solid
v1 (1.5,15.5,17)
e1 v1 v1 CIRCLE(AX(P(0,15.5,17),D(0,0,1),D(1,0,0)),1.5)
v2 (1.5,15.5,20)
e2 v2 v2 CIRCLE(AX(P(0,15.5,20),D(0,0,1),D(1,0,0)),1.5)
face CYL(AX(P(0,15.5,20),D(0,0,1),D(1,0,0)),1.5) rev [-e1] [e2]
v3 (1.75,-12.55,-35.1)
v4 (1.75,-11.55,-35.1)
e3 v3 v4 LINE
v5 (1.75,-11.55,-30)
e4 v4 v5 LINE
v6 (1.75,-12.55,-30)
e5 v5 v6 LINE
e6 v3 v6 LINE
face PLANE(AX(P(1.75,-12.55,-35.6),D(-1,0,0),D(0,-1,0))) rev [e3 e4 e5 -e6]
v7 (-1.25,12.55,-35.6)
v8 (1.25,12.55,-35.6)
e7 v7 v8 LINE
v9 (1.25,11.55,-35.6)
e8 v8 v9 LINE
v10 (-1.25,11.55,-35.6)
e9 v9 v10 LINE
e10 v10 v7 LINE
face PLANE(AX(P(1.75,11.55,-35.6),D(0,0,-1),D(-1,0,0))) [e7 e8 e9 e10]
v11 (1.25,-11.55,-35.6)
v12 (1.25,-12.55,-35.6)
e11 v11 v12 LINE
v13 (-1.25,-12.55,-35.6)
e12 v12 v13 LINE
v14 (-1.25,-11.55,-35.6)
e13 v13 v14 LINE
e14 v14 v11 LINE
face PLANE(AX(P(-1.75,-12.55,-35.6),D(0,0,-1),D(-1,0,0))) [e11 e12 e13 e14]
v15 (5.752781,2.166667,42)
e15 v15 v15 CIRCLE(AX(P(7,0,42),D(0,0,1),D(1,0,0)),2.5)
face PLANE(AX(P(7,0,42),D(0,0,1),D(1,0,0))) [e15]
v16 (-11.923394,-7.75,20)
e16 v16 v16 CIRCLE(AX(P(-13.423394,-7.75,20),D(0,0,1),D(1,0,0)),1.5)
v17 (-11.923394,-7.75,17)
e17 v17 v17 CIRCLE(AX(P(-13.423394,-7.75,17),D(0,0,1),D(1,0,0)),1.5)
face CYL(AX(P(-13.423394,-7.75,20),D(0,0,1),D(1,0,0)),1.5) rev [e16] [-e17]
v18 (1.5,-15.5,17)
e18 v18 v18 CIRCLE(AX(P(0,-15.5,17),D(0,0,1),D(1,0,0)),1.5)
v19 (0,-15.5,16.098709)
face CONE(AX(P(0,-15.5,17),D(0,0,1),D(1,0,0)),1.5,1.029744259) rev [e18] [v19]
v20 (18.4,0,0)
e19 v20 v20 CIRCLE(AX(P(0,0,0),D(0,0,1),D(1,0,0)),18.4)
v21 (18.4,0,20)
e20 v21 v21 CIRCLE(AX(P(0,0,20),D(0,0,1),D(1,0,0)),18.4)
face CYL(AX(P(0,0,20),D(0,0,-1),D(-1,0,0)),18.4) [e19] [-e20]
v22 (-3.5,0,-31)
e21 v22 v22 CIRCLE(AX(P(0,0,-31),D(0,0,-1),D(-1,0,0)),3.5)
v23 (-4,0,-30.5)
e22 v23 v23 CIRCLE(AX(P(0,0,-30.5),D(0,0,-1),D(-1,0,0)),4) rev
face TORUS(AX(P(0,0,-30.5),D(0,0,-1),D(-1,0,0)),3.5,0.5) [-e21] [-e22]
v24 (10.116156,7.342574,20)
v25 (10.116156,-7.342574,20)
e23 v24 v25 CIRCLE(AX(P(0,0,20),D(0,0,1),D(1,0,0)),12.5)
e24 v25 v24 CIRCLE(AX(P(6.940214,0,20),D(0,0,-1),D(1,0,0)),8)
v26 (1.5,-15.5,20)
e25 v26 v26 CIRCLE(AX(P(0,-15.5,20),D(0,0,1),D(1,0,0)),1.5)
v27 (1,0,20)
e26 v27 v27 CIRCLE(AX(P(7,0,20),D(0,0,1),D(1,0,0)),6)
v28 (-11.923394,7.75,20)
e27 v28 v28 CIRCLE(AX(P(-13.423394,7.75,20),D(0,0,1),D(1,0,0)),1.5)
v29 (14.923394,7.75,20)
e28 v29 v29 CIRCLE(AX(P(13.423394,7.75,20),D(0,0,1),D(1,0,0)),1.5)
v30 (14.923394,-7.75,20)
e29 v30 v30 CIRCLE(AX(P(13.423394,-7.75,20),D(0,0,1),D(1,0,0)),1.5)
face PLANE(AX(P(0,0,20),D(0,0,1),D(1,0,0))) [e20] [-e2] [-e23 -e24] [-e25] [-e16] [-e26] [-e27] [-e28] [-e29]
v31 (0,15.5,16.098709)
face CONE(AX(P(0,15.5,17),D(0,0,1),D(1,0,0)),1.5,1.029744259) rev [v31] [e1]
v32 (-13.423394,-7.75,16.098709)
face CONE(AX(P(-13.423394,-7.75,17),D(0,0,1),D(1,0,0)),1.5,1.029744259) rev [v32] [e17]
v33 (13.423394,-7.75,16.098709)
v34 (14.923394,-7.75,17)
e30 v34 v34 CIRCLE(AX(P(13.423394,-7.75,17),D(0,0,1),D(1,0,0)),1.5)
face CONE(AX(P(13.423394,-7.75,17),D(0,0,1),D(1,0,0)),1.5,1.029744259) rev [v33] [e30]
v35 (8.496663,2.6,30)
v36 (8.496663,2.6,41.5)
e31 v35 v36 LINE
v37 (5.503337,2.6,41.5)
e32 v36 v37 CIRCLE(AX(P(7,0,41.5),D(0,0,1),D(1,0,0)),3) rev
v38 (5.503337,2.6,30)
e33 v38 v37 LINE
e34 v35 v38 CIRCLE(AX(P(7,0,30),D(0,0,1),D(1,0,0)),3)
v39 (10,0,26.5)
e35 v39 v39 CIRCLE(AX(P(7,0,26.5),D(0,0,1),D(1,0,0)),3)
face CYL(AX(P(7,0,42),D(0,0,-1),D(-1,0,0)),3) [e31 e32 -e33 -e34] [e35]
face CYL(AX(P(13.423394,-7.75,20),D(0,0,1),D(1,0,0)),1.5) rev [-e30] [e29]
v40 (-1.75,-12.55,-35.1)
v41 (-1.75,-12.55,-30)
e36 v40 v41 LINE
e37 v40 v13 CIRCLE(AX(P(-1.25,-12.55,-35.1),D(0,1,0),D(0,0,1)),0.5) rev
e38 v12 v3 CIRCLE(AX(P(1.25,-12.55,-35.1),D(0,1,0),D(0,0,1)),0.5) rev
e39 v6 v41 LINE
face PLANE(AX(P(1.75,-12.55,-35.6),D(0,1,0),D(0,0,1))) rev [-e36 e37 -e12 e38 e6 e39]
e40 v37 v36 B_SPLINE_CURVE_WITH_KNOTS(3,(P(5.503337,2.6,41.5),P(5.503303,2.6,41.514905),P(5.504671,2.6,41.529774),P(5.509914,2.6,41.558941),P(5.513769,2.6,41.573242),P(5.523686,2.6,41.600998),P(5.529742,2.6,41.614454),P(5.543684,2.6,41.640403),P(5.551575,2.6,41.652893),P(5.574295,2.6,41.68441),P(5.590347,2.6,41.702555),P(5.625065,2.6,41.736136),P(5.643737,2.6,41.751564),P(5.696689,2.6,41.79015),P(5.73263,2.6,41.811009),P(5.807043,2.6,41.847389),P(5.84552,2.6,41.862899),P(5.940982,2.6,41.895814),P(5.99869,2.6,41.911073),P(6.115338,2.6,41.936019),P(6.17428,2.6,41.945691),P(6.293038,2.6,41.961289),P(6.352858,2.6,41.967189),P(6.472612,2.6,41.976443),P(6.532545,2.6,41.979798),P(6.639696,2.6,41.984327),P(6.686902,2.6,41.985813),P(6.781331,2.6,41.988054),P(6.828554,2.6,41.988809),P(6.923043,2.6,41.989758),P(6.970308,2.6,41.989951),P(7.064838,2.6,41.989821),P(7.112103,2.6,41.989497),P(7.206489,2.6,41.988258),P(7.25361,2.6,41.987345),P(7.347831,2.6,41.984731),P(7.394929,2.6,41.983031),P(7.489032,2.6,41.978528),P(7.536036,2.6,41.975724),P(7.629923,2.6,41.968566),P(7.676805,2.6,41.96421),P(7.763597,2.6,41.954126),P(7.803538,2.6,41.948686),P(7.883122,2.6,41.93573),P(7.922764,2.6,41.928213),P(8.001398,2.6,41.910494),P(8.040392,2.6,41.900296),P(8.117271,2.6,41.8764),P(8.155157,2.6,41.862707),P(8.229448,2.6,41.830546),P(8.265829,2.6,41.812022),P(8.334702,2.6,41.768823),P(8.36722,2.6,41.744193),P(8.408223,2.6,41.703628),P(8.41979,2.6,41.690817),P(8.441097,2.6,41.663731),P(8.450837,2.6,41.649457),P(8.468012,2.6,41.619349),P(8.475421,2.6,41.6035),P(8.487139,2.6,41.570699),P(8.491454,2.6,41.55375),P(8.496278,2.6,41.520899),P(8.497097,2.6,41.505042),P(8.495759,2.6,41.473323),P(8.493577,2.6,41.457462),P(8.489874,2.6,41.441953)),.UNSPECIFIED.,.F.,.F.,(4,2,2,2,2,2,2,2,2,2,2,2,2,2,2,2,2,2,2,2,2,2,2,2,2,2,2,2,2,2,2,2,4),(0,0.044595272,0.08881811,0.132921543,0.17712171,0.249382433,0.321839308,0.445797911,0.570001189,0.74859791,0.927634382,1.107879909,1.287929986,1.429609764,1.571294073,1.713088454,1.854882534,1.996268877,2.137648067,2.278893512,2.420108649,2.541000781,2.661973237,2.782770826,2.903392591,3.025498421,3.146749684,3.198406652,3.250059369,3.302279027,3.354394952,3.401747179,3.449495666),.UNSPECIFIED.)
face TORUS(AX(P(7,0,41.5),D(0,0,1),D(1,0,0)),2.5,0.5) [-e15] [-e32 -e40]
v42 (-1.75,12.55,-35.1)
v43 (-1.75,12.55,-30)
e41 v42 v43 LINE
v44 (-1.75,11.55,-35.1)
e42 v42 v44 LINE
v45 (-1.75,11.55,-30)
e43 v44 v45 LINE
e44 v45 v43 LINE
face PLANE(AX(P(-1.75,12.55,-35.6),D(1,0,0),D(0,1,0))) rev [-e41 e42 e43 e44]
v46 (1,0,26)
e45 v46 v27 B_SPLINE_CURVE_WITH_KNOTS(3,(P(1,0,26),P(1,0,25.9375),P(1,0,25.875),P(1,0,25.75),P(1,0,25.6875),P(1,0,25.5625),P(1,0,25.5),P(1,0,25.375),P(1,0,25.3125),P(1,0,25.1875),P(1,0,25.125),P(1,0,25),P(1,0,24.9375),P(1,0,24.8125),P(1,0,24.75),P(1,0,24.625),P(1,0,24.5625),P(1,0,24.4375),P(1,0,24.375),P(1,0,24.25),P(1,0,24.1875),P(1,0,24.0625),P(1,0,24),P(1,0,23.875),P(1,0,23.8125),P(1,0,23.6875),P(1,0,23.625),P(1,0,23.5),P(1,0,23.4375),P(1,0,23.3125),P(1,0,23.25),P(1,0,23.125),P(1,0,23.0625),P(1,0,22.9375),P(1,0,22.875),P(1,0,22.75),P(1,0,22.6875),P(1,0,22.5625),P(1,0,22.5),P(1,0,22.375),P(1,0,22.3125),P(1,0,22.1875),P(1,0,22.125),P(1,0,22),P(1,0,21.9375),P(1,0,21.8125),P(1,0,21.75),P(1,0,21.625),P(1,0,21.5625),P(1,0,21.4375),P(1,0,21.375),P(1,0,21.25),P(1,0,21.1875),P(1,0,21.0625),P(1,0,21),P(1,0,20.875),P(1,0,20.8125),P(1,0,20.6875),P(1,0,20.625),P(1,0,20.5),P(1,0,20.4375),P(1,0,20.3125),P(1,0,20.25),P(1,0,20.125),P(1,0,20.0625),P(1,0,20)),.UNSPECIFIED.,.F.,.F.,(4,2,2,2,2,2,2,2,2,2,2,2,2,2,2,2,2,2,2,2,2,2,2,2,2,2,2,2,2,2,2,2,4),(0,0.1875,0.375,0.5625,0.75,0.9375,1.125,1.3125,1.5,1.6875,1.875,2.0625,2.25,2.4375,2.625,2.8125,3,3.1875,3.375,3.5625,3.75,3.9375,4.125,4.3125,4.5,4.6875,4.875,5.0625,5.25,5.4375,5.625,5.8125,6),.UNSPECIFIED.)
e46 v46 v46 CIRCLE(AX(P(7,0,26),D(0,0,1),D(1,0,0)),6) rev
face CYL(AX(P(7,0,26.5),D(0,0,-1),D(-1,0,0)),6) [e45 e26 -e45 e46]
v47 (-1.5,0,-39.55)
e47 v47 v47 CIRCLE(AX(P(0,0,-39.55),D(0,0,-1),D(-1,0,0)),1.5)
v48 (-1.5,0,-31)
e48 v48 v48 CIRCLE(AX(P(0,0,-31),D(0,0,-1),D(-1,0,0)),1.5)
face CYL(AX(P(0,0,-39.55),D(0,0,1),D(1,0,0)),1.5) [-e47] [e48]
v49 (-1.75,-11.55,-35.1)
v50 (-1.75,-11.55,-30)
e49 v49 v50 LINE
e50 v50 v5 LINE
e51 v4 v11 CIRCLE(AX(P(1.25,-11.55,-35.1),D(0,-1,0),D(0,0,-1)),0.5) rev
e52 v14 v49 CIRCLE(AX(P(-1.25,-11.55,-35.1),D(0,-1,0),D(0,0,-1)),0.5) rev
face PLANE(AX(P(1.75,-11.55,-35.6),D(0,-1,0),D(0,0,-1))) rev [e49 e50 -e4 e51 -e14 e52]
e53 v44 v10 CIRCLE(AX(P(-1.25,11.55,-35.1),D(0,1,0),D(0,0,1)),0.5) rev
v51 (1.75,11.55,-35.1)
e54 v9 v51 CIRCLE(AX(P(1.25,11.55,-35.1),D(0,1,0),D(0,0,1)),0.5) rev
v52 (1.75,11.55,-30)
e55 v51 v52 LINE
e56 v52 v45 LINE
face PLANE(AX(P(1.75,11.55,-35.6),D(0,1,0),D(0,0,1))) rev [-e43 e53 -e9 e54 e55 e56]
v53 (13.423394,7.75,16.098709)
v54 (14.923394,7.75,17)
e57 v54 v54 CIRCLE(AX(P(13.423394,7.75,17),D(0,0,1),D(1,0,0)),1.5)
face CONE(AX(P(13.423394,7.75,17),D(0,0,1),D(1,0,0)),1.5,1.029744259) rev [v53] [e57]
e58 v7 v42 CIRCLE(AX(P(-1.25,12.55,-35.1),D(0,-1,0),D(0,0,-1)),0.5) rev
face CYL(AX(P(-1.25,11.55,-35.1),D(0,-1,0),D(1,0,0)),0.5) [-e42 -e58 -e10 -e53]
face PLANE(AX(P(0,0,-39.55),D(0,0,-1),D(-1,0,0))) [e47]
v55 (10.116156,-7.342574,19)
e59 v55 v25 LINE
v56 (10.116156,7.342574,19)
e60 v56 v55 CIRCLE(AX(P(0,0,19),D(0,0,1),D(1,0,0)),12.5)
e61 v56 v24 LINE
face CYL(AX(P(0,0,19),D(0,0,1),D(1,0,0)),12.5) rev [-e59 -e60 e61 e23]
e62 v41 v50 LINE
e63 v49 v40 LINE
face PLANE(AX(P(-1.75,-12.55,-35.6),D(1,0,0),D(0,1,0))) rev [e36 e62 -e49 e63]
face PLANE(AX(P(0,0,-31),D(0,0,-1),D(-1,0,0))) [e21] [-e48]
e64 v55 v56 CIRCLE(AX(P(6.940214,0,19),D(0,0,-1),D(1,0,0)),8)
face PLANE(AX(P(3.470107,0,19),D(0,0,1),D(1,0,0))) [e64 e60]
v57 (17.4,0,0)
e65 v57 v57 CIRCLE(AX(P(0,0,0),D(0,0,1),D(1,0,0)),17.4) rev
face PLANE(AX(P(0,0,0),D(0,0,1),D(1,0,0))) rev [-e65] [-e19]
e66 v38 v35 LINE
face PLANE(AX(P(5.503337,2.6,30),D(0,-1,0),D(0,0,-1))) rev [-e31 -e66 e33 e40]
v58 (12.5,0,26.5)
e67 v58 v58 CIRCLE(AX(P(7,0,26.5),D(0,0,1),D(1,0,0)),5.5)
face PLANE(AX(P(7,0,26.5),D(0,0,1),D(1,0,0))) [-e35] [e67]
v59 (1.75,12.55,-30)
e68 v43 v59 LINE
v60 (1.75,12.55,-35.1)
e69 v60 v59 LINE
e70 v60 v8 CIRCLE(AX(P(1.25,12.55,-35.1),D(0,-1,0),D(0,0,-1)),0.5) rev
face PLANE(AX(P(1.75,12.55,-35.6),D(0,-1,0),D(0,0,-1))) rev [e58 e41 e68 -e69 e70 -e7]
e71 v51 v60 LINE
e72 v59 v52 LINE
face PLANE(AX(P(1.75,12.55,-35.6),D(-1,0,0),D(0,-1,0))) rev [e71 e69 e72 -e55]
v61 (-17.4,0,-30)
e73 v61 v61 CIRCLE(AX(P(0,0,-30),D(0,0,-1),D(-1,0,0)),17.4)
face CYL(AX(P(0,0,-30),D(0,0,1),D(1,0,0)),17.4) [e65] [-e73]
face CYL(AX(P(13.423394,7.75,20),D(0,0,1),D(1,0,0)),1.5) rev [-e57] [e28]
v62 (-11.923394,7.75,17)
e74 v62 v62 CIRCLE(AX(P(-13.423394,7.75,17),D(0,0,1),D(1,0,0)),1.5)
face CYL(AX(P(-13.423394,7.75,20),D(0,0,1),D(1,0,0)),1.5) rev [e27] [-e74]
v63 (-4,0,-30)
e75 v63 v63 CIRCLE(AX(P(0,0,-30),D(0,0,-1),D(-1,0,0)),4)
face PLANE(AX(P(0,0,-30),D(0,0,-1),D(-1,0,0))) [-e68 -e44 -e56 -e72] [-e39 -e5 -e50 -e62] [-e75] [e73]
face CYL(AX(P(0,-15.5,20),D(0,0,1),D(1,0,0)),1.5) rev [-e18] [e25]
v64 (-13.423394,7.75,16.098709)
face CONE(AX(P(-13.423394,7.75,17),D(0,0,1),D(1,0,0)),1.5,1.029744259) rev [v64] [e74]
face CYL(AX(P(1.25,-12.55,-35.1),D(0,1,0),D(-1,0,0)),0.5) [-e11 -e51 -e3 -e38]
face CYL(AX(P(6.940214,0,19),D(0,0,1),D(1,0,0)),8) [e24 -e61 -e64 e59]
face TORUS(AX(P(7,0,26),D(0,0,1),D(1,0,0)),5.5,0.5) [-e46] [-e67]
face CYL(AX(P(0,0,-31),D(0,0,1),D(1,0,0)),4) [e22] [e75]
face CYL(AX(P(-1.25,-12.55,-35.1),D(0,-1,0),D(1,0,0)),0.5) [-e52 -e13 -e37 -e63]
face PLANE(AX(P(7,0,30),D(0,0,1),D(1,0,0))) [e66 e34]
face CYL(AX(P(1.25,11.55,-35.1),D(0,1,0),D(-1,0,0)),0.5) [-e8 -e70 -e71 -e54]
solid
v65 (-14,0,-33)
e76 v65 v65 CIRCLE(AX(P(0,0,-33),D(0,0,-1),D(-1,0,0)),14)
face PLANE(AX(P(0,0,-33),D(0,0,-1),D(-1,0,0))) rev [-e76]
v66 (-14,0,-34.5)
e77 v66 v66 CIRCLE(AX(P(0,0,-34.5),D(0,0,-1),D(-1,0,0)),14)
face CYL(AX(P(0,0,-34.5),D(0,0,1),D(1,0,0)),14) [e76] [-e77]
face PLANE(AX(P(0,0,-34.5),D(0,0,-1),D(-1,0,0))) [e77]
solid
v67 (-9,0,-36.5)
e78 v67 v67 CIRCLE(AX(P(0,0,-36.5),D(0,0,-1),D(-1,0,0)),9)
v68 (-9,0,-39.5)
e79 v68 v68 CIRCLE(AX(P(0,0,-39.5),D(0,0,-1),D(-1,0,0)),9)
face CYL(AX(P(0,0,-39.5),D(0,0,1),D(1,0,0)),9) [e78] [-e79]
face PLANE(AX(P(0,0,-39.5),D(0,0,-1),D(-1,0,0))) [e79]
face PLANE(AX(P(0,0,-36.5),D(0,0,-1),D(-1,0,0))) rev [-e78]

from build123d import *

# Parameters (mm, degrees)
SKETCH1_R                    = 18.4
BOSS_EXTRUDE1_DEPTH          = 20
SKETCH2_R                    = 17.4
BOSS_EXTRUDE2_DEPTH          = 30
SKETCH3_R                    = 6
BOSS_EXTRUDE3_DEPTH          = 6.5
FILLET1_R                    = 0.5
SKETCH4_R                    = 3
BOSS_EXTRUDE4_DEPTH          = 15.5
CUT_EXTRUDE1_START           = -12
CUT_EXTRUDE1_DEPTH           = 12
F_3_0_3_DIAMETER_HOLE1_D     = 3
F_3_0_3_DIAMETER_HOLE1_DEPTH = 3
F_3_0_3_DIAMETER_HOLE1_TIP   = 0.901290929
CUT_EXTRUDE2_DEPTH           = 1
SKETCH9_R                    = 4
BOSS_EXTRUDE5_DEPTH          = 1
FILLET2_R                    = 0.5
SKETCH10_R                   = 14
BOSS_EXTRUDE6_DEPTH          = 1.5
SKETCH11_W                   = 3.5
SKETCH11_H                   = 1
BOSS_EXTRUDE7_DEPTH          = 5.6
FILLET3_R                    = 0.5
SKETCH13_R                   = 9
BOSS_EXTRUDE8_DEPTH          = 3
SKETCH14_R                   = 1.5
BOSS_EXTRUDE9_DEPTH          = 8.55
FILLET4_R                    = 0.5


with BuildPart() as part:
    # Sketch1 → Boss-Extrude1 (new body)
    with BuildSketch(Plane.XY):
        Circle(SKETCH1_R)
    extrude(amount=BOSS_EXTRUDE1_DEPTH)

    # Sketch2 → Boss-Extrude2 (add)
    with BuildSketch(Plane(origin=(0, 0, 0), x_dir=(-1, 0, 0), z_dir=(0, 0, -1))):
        with Locations(Location((0, 0, 0), (0, 0, 180))):
            Circle(SKETCH2_R)
    extrude(amount=BOSS_EXTRUDE2_DEPTH)

    # Sketch3 → Boss-Extrude3 (add)
    with BuildSketch(Plane.XY.offset(20)):
        with Locations(Location((7, 0, 0), (0, 0, 180))):
            Circle(SKETCH3_R)
    extrude(amount=BOSS_EXTRUDE3_DEPTH)

    # Fillet1
    fillet1_edges = [part.edges().sort_by_distance(p)[0] for p in [
        (13, 0, 26.5),
    ]]
    fillet(fillet1_edges, radius=FILLET1_R)

    # Sketch4 → Boss-Extrude4 (add)
    with BuildSketch(Plane.XY.offset(26.5)):
        with Locations((7, 0)):
            Circle(SKETCH4_R)
    extrude(amount=BOSS_EXTRUDE4_DEPTH)

    # Sketch5 → Cut-Extrude1 (cut)
    with BuildSketch(Plane.XY.offset(42).offset(CUT_EXTRUDE1_START)):
        with BuildLine():
            Line((5.503337045, 2.6), (8.496662955, 2.6))
            ThreePointArc((8.496662955, 2.6), (7, 3), (5.503337045, 2.6))
        make_face()
    extrude(amount=CUT_EXTRUDE1_DEPTH, mode=Mode.SUBTRACT)

    # Ø3.0 (3) Diameter Hole1
    with Locations(Plane.XY.offset(20)):
        with Locations((-13.423393759, 7.75), (-13.423393759, -7.75), (0, -15.5), (13.423393759, 7.75), (0, 15.5), (13.423393759, -7.75)):
            Hole(F_3_0_3_DIAMETER_HOLE1_D / 2, depth=F_3_0_3_DIAMETER_HOLE1_DEPTH)
            with Locations((0, 0, -(F_3_0_3_DIAMETER_HOLE1_DEPTH + F_3_0_3_DIAMETER_HOLE1_TIP / 2))):  # 118° drill point
                Cone(0, F_3_0_3_DIAMETER_HOLE1_D / 2, F_3_0_3_DIAMETER_HOLE1_TIP, mode=Mode.SUBTRACT)

    # Sketch8 → Cut-Extrude2 (cut)
    with BuildSketch(Plane.XY.offset(20)):
        with BuildLine():
            ThreePointArc((10.116155685, 7.342574083), (-12.5, 0), (10.116155685, -7.342574083))
            ThreePointArc((10.116155685, -7.342574083), (-1.05978604, 0), (10.116155685, 7.342574083))
        make_face()
    extrude(amount=-CUT_EXTRUDE2_DEPTH, mode=Mode.SUBTRACT)

    # Sketch9 → Boss-Extrude5 (add)
    with BuildSketch(Plane(origin=(0, 0, -30), x_dir=(-1, 0, 0), z_dir=(0, 0, -1))):
        Circle(SKETCH9_R)
    extrude(amount=BOSS_EXTRUDE5_DEPTH)

    # Fillet2
    fillet2_edges = [part.edges().sort_by_distance(p)[0] for p in [
        (4, 0, -31),
    ]]
    fillet(fillet2_edges, radius=FILLET2_R)

    # Sketch11 → Boss-Extrude7 (add)
    with BuildSketch(Plane(origin=(0, 0, -30), x_dir=(-1, 0, 0), z_dir=(0, 0, -1))):
        with Locations((0, 12.05)):
            Rectangle(SKETCH11_W, SKETCH11_H)
        with Locations((0, -12.05)):
            Rectangle(SKETCH11_W, SKETCH11_H)
    extrude(amount=BOSS_EXTRUDE7_DEPTH)

    # Fillet3
    fillet3_edges = [part.edges().sort_by_distance(p)[0] for p in [
        (1.75, 12.05, -35.6),
        (-1.75, 12.05, -35.6),
        (-1.75, -12.05, -35.6),
        (1.75, -12.05, -35.6),
    ]]
    fillet(fillet3_edges, radius=FILLET3_R)

    # Sketch14 → Boss-Extrude9 (add)
    with BuildSketch(Plane(origin=(0, 0, -31), x_dir=(-1, 0, 0), z_dir=(0, 0, -1))):
        Circle(SKETCH14_R)
    extrude(amount=BOSS_EXTRUDE9_DEPTH)

    # Fillet4
    # the kernel refuses this fillet: 0.5 mm, written as the material it takes off along each edge
    with BuildSketch(Plane(origin=(7, 0, 42), x_dir=(0.4622655728594592, 0.8867415295050277, 0), z_dir=(0.8867415295050277, -0.4622655728594592, 0))) as fillet4_piece_1:
        with BuildLine():
            CenterArc((3 - FILLET4_R, -FILLET4_R), FILLET4_R, 0, 90)
            Line((3 - FILLET4_R, 0), (3 - FILLET4_R, FILLET4_R * 0.02))
            Line((3 - FILLET4_R, FILLET4_R * 0.02), (3 + FILLET4_R * 0.02, FILLET4_R * 0.02))
            Line((3 + FILLET4_R * 0.02, FILLET4_R * 0.02), (3 + FILLET4_R * 0.02, -FILLET4_R))
            Line((3 + FILLET4_R * 0.02, -FILLET4_R), (3, -FILLET4_R))
        make_face()
    revolve(axis=Axis((7, 0, 42), (0, 0, 1)), revolution_arc=297.533397677, mode=Mode.SUBTRACT)
    with BuildSketch(Plane(origin=(7, 0, 42), x_dir=(1, 0, 0), z_dir=(0, -1, 0))) as fillet4_piece_2:
        with BuildLine():
            CenterArc((3 - FILLET4_R, -FILLET4_R), FILLET4_R, 0, 90)
            Line((3 - FILLET4_R, 0), (3 - FILLET4_R, FILLET4_R * 0.02))
            Line((3 - FILLET4_R, FILLET4_R * 0.02), (3 + FILLET4_R * 0.02, FILLET4_R * 0.02))
            Line((3 + FILLET4_R * 0.02, FILLET4_R * 0.02), (3 + FILLET4_R * 0.02, -FILLET4_R))
            Line((3 + FILLET4_R * 0.02, -FILLET4_R), (3, -FILLET4_R))
        make_face()
    revolve(axis=Axis((7, 0, 42), (0, 0, 1)), revolution_arc=117.379597562, mode=Mode.SUBTRACT)


with BuildPart() as body_2:
    # Sketch10 → Boss-Extrude6 (new body)
    with BuildSketch(Plane(origin=(0, 0, -33), x_dir=(-1, 0, 0), z_dir=(0, 0, -1))):
        Circle(SKETCH10_R)
    extrude(amount=BOSS_EXTRUDE6_DEPTH)


with BuildPart() as body_3:
    # Sketch13 → Boss-Extrude8 (new body)
    with BuildSketch(Plane(origin=(0, 0, -36.5), x_dir=(-1, 0, 0), z_dir=(0, 0, -1))):
        Circle(SKETCH13_R)
    extrude(amount=BOSS_EXTRUDE8_DEPTH)


solid = Compound([part.part, body_2.part, body_3.part])
